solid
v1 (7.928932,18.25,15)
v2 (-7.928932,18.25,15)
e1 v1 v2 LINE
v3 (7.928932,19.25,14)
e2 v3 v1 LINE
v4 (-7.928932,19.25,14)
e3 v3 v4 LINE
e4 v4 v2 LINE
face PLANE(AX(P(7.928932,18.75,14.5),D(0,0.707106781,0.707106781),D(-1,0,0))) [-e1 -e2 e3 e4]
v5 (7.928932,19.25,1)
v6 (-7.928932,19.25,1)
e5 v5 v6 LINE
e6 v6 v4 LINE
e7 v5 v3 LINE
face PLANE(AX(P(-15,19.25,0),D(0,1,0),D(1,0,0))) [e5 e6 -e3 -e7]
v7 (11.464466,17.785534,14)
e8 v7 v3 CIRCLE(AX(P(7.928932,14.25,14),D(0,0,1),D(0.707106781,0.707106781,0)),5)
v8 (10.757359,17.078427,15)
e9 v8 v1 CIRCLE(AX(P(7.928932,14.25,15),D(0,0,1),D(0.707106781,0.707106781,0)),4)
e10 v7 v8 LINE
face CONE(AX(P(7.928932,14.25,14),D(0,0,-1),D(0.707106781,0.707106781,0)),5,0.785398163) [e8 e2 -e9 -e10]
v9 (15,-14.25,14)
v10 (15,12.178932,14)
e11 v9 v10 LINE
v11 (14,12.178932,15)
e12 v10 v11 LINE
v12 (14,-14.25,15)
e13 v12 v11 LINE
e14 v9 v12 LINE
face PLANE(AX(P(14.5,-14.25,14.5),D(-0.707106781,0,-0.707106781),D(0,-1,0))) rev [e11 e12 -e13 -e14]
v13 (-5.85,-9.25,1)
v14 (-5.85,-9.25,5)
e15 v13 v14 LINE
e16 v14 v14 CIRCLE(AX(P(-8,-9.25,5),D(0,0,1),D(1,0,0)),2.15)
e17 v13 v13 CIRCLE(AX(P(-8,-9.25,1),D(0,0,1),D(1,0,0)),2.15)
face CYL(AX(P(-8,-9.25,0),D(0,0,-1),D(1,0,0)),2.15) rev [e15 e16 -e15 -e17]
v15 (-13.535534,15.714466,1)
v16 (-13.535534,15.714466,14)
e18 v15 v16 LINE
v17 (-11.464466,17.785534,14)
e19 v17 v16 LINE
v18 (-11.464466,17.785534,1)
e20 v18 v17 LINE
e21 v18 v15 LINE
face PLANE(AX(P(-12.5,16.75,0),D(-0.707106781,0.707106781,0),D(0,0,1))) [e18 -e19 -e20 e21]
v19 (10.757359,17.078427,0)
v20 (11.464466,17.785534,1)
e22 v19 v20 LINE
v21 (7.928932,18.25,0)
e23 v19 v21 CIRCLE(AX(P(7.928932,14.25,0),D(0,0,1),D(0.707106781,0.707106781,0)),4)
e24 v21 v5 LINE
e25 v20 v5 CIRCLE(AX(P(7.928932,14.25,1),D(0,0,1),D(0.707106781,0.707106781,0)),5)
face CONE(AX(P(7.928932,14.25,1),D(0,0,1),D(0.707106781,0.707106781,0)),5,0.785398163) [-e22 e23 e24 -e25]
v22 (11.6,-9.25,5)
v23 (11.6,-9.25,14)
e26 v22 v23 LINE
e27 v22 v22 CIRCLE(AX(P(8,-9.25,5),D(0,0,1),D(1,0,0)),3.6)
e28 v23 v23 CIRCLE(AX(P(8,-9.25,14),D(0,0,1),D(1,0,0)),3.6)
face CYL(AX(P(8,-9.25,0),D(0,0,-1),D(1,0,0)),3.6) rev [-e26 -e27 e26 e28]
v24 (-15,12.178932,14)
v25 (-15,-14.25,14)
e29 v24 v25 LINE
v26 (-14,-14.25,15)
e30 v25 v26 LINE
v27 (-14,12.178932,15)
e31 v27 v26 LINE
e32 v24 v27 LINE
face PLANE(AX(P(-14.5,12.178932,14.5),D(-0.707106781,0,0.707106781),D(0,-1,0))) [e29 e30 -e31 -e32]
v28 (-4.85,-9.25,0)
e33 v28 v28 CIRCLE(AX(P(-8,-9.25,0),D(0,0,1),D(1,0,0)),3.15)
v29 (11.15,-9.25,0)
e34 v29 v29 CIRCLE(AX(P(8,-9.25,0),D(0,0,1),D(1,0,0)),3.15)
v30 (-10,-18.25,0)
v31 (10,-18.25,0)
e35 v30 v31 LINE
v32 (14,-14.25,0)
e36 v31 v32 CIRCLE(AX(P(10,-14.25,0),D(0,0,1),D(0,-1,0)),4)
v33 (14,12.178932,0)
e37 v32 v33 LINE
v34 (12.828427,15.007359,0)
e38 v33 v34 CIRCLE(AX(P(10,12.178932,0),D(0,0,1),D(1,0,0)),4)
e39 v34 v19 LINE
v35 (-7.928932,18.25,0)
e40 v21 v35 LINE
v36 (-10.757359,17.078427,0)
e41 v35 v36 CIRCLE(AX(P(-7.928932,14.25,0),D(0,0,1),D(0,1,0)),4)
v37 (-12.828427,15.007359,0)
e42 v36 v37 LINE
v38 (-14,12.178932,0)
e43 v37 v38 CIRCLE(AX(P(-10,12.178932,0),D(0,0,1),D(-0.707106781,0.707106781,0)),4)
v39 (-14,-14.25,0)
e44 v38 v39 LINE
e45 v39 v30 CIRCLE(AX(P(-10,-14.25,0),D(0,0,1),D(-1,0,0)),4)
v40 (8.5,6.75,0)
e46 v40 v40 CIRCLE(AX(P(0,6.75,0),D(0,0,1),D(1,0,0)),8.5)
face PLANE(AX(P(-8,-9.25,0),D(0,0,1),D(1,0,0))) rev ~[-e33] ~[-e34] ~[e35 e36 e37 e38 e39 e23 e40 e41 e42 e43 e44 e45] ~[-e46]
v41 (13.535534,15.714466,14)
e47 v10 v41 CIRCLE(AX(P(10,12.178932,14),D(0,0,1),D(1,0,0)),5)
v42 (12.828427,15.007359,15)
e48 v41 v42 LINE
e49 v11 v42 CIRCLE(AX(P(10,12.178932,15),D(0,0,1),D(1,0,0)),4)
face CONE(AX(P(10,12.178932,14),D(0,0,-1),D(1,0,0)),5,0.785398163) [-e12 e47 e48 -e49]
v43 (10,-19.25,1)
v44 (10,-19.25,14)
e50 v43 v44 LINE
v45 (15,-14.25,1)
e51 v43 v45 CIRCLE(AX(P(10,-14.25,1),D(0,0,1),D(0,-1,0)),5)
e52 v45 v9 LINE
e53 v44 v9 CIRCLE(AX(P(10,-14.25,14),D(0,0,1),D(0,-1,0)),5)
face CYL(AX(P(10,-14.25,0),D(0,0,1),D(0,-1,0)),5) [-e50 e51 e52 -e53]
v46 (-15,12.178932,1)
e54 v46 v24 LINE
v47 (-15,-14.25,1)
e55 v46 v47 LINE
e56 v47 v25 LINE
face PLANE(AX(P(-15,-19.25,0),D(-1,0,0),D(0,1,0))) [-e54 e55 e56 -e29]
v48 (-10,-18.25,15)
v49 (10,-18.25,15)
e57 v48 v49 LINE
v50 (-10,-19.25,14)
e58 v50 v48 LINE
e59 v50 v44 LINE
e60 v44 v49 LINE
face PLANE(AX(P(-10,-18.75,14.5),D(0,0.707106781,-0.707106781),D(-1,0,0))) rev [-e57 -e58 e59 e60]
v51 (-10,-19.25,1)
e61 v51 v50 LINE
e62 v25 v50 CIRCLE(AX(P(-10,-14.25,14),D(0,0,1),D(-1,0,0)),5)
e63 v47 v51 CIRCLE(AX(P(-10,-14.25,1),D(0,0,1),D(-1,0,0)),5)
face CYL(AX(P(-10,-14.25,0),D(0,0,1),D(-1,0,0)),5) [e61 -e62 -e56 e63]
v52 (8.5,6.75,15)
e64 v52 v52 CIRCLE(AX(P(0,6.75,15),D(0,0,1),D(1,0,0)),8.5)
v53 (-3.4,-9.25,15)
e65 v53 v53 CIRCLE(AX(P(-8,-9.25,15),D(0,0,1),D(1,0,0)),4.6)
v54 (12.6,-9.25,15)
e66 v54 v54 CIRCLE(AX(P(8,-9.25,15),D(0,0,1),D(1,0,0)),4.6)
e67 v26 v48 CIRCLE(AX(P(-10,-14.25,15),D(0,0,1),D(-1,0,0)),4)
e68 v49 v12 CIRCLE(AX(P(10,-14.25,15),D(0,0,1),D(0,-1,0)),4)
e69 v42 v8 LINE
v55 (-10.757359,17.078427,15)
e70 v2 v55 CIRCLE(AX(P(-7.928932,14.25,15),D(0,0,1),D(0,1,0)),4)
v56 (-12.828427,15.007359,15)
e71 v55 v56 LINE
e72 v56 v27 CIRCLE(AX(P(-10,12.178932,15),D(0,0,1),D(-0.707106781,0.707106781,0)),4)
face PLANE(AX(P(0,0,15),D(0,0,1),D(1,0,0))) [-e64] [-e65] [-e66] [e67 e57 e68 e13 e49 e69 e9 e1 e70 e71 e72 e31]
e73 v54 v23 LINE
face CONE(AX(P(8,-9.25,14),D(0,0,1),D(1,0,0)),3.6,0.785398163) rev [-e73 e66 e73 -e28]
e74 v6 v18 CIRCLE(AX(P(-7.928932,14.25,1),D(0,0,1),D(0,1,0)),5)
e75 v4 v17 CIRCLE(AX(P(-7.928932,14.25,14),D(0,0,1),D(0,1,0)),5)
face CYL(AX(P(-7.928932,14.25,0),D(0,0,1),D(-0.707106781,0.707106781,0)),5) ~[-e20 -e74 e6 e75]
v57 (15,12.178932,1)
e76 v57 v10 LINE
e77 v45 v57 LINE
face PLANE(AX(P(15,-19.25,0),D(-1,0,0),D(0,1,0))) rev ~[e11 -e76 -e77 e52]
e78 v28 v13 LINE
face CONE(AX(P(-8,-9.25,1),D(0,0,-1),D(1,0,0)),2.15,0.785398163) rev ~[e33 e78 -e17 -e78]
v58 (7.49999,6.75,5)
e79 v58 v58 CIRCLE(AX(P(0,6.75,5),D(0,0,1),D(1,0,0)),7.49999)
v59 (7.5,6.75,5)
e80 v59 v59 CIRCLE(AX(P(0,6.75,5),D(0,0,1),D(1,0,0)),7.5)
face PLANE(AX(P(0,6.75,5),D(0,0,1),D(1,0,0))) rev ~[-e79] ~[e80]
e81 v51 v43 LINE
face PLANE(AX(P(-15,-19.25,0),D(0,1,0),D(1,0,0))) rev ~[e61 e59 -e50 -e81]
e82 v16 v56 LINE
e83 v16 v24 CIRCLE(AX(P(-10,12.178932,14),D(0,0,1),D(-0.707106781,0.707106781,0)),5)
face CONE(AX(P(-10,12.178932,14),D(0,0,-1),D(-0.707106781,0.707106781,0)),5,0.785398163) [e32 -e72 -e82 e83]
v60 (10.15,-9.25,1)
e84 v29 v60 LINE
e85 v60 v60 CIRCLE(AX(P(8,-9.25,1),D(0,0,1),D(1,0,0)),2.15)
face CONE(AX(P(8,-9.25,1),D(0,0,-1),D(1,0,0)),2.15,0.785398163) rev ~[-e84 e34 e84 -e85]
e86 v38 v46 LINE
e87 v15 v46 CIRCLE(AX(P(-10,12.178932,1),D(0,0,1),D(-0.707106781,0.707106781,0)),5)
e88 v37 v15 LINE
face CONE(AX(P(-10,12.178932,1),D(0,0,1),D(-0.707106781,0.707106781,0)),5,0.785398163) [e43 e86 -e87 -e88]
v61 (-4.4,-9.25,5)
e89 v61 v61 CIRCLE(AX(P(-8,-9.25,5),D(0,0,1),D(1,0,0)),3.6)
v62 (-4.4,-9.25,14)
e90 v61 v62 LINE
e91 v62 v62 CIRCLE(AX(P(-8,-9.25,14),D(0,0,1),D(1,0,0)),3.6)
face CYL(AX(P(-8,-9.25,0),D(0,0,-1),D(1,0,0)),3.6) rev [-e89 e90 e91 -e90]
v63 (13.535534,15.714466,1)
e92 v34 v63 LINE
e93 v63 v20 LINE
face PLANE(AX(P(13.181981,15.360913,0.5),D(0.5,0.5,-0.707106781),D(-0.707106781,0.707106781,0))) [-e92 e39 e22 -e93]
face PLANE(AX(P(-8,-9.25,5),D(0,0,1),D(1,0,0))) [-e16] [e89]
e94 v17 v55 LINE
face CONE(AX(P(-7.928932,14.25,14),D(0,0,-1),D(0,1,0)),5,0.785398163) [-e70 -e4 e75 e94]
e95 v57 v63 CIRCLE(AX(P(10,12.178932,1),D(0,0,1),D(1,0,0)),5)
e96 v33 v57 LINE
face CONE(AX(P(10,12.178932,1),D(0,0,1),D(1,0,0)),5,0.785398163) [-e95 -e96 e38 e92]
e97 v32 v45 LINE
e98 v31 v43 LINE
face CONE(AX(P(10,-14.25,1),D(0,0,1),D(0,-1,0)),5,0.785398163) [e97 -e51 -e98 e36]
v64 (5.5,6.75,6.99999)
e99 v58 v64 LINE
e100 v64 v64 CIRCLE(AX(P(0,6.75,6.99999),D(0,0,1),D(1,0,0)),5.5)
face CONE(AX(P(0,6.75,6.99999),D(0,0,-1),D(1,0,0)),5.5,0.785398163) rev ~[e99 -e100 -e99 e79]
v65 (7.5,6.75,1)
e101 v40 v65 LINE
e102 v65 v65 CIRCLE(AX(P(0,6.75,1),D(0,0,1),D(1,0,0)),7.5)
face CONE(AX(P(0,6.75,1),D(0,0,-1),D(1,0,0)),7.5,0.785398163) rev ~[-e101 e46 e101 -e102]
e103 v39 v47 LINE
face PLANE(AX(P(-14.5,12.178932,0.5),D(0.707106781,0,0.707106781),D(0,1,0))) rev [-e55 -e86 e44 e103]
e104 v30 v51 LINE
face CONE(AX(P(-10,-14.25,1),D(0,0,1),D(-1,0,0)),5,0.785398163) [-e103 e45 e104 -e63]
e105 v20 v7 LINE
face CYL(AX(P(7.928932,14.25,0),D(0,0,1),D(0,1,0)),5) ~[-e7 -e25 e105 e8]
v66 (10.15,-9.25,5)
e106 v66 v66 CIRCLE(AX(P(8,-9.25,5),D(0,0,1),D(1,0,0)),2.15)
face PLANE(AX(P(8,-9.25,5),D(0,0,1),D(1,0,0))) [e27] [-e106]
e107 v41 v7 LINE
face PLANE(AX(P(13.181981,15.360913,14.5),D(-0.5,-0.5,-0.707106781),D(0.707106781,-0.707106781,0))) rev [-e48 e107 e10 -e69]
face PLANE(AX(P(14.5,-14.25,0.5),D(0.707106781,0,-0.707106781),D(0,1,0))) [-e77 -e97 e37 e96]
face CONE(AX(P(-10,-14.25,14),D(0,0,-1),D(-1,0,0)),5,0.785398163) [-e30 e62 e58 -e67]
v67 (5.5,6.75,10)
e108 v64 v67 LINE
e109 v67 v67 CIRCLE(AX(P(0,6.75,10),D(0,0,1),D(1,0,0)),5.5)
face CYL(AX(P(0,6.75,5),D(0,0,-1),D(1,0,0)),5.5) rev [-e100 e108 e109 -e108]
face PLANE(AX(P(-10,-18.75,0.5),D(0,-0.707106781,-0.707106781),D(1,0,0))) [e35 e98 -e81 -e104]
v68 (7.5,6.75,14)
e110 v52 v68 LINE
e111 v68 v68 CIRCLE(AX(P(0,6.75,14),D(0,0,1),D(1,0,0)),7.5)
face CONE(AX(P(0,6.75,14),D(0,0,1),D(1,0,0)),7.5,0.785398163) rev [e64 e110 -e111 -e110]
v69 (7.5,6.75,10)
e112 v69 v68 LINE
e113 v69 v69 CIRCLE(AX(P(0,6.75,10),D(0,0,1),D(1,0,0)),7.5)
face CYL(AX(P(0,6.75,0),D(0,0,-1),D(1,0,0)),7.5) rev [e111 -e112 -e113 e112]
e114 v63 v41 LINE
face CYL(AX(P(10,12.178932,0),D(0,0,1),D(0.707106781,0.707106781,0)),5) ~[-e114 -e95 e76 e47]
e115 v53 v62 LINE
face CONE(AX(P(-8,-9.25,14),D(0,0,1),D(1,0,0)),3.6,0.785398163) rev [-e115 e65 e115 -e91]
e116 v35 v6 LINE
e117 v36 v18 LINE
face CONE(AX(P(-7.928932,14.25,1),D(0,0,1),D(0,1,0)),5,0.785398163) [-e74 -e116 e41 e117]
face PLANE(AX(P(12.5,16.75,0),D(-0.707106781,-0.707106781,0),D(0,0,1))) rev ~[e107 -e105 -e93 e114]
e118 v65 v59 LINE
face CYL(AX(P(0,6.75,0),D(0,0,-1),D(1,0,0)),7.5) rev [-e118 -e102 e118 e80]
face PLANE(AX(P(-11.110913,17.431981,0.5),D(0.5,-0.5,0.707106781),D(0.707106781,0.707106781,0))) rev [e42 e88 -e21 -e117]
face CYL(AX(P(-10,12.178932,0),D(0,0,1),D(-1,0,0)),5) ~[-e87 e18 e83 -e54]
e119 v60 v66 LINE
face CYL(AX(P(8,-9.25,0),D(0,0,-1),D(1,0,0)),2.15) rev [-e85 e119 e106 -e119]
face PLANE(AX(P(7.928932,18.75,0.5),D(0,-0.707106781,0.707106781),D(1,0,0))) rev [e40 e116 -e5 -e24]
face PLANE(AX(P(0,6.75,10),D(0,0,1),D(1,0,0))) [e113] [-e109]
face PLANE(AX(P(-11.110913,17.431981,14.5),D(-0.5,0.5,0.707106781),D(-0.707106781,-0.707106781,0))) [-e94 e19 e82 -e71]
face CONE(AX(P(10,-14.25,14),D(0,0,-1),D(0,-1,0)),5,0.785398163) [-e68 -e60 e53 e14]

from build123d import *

# Parameters (mm, degrees)
F0_W     = 30
F0_H     = 38.5
F0_R     = 3.6
F0_R_2   = 7.5
F1_DEPTH = 15
F0_R_3   = 2.15
F2_DEPTH = 5
F3_START = 5
F0_R_4   = 5.5
F3_DEPTH = 5
F4_SIZE  = 1.99999
F5_SIZE  = 5
F6_R     = 5
F7_R     = 5
F8_SIZE  = 1


# Not quite as in the source:
# - a fillet or chamfer is up to 0.001 mm smaller than in the source, because OpenCascade refuses the exact size


with BuildPart() as f1:
    # F0 (on Top) → F1 (new body)
    with BuildSketch(Plane.XY):
        Rectangle(F0_W, F0_H)
        with Locations((-8, -9.25)):
            Circle(F0_R, mode=Mode.SUBTRACT)
        with Locations((8, -9.25)):
            Circle(F0_R, mode=Mode.SUBTRACT)
        with Locations((0, 6.75)):
            Circle(F0_R_2, mode=Mode.SUBTRACT)
    extrude(amount=F1_DEPTH)

    # F0 (on Top) → F2 (join)
    with BuildSketch(Plane.XY):
        with Locations((-8, -9.25)):
            Circle(F0_R)
        with Locations((-8, -9.25)):
            Circle(F0_R_3, mode=Mode.SUBTRACT)
        with Locations((8, -9.25)):
            Circle(F0_R)
        with Locations((8, -9.25)):
            Circle(F0_R_3, mode=Mode.SUBTRACT)
    extrude(amount=F2_DEPTH)

    # F0 (on Top) → F3 (join)
    with BuildSketch(Plane.XY.offset(F3_START)):
        with Locations((0, 6.75)):
            Circle(F0_R_2)
        with Locations((0, 6.75)):
            Circle(F0_R_4, mode=Mode.SUBTRACT)
    extrude(amount=F3_DEPTH)

    # F4 (size 2 in the source; OpenCascade refuses exactly that, so slightly less here)
    f4_edges = [f1.edges().sort_by_distance(p)[0] for p in [
        (-5.5, 6.75, 5),
    ]]
    chamfer(f4_edges, length=F4_SIZE)

    # F5
    f5_edges = [f1.edges().sort_by_distance(p)[0] for p in [
        (15, 19.25, 7.5),
        (-15, 19.25, 7.5),
    ]]
    chamfer(f5_edges, length=F5_SIZE)

    # F6
    f6_edges = [f1.edges().sort_by_distance(p)[0] for p in [
        (15, -19.25, 7.5),
        (-15, -19.25, 7.5),
    ]]
    fillet(f6_edges, radius=F6_R)

    # F7
    f7_edges = [f1.edges().sort_by_distance(p)[0] for p in [
        (15, 14.25, 7.5),
        (10, 19.25, 7.5),
        (-10, 19.25, 7.5),
        (-15, 14.25, 7.5),
    ]]
    fillet(f7_edges, radius=F7_R)

    # F8
    f8_edges = [f1.edges().sort_by_distance(p)[0] for p in [
        (15, -1.035534, 15),
        (14.619398, 14.092349, 15),
        (13.535534, -17.785534, 15),
        (12.5, 16.75, 15),
        (0, -19.25, 15),
        (9.842349, 18.869398, 15),
        (-13.535534, -17.785534, 15),
        (0, 19.25, 15),
        (-15, -1.035534, 15),
        (-9.842349, 18.869398, 15),
        (-14.619398, 14.092349, 15),
        (-12.5, 16.75, 15),
        (-11.6, -9.25, 15),
        (4.4, -9.25, 15),
        (-7.5, 6.75, 15),
        (15, -1.035534, 0),
        (14.619398, 14.092349, 0),
        (13.535534, -17.785534, 0),
        (12.5, 16.75, 0),
        (0, -19.25, 0),
        (9.842349, 18.869398, 0),
        (-13.535534, -17.785534, 0),
        (0, 19.25, 0),
        (-15, -1.035534, 0),
        (-9.842349, 18.869398, 0),
        (-14.619398, 14.092349, 0),
        (-12.5, 16.75, 0),
        (-7.5, 6.75, 0),
        (-10.15, -9.25, 0),
        (5.85, -9.25, 0),
    ]]
    chamfer(f8_edges, length=F8_SIZE)


solid = f1.part
